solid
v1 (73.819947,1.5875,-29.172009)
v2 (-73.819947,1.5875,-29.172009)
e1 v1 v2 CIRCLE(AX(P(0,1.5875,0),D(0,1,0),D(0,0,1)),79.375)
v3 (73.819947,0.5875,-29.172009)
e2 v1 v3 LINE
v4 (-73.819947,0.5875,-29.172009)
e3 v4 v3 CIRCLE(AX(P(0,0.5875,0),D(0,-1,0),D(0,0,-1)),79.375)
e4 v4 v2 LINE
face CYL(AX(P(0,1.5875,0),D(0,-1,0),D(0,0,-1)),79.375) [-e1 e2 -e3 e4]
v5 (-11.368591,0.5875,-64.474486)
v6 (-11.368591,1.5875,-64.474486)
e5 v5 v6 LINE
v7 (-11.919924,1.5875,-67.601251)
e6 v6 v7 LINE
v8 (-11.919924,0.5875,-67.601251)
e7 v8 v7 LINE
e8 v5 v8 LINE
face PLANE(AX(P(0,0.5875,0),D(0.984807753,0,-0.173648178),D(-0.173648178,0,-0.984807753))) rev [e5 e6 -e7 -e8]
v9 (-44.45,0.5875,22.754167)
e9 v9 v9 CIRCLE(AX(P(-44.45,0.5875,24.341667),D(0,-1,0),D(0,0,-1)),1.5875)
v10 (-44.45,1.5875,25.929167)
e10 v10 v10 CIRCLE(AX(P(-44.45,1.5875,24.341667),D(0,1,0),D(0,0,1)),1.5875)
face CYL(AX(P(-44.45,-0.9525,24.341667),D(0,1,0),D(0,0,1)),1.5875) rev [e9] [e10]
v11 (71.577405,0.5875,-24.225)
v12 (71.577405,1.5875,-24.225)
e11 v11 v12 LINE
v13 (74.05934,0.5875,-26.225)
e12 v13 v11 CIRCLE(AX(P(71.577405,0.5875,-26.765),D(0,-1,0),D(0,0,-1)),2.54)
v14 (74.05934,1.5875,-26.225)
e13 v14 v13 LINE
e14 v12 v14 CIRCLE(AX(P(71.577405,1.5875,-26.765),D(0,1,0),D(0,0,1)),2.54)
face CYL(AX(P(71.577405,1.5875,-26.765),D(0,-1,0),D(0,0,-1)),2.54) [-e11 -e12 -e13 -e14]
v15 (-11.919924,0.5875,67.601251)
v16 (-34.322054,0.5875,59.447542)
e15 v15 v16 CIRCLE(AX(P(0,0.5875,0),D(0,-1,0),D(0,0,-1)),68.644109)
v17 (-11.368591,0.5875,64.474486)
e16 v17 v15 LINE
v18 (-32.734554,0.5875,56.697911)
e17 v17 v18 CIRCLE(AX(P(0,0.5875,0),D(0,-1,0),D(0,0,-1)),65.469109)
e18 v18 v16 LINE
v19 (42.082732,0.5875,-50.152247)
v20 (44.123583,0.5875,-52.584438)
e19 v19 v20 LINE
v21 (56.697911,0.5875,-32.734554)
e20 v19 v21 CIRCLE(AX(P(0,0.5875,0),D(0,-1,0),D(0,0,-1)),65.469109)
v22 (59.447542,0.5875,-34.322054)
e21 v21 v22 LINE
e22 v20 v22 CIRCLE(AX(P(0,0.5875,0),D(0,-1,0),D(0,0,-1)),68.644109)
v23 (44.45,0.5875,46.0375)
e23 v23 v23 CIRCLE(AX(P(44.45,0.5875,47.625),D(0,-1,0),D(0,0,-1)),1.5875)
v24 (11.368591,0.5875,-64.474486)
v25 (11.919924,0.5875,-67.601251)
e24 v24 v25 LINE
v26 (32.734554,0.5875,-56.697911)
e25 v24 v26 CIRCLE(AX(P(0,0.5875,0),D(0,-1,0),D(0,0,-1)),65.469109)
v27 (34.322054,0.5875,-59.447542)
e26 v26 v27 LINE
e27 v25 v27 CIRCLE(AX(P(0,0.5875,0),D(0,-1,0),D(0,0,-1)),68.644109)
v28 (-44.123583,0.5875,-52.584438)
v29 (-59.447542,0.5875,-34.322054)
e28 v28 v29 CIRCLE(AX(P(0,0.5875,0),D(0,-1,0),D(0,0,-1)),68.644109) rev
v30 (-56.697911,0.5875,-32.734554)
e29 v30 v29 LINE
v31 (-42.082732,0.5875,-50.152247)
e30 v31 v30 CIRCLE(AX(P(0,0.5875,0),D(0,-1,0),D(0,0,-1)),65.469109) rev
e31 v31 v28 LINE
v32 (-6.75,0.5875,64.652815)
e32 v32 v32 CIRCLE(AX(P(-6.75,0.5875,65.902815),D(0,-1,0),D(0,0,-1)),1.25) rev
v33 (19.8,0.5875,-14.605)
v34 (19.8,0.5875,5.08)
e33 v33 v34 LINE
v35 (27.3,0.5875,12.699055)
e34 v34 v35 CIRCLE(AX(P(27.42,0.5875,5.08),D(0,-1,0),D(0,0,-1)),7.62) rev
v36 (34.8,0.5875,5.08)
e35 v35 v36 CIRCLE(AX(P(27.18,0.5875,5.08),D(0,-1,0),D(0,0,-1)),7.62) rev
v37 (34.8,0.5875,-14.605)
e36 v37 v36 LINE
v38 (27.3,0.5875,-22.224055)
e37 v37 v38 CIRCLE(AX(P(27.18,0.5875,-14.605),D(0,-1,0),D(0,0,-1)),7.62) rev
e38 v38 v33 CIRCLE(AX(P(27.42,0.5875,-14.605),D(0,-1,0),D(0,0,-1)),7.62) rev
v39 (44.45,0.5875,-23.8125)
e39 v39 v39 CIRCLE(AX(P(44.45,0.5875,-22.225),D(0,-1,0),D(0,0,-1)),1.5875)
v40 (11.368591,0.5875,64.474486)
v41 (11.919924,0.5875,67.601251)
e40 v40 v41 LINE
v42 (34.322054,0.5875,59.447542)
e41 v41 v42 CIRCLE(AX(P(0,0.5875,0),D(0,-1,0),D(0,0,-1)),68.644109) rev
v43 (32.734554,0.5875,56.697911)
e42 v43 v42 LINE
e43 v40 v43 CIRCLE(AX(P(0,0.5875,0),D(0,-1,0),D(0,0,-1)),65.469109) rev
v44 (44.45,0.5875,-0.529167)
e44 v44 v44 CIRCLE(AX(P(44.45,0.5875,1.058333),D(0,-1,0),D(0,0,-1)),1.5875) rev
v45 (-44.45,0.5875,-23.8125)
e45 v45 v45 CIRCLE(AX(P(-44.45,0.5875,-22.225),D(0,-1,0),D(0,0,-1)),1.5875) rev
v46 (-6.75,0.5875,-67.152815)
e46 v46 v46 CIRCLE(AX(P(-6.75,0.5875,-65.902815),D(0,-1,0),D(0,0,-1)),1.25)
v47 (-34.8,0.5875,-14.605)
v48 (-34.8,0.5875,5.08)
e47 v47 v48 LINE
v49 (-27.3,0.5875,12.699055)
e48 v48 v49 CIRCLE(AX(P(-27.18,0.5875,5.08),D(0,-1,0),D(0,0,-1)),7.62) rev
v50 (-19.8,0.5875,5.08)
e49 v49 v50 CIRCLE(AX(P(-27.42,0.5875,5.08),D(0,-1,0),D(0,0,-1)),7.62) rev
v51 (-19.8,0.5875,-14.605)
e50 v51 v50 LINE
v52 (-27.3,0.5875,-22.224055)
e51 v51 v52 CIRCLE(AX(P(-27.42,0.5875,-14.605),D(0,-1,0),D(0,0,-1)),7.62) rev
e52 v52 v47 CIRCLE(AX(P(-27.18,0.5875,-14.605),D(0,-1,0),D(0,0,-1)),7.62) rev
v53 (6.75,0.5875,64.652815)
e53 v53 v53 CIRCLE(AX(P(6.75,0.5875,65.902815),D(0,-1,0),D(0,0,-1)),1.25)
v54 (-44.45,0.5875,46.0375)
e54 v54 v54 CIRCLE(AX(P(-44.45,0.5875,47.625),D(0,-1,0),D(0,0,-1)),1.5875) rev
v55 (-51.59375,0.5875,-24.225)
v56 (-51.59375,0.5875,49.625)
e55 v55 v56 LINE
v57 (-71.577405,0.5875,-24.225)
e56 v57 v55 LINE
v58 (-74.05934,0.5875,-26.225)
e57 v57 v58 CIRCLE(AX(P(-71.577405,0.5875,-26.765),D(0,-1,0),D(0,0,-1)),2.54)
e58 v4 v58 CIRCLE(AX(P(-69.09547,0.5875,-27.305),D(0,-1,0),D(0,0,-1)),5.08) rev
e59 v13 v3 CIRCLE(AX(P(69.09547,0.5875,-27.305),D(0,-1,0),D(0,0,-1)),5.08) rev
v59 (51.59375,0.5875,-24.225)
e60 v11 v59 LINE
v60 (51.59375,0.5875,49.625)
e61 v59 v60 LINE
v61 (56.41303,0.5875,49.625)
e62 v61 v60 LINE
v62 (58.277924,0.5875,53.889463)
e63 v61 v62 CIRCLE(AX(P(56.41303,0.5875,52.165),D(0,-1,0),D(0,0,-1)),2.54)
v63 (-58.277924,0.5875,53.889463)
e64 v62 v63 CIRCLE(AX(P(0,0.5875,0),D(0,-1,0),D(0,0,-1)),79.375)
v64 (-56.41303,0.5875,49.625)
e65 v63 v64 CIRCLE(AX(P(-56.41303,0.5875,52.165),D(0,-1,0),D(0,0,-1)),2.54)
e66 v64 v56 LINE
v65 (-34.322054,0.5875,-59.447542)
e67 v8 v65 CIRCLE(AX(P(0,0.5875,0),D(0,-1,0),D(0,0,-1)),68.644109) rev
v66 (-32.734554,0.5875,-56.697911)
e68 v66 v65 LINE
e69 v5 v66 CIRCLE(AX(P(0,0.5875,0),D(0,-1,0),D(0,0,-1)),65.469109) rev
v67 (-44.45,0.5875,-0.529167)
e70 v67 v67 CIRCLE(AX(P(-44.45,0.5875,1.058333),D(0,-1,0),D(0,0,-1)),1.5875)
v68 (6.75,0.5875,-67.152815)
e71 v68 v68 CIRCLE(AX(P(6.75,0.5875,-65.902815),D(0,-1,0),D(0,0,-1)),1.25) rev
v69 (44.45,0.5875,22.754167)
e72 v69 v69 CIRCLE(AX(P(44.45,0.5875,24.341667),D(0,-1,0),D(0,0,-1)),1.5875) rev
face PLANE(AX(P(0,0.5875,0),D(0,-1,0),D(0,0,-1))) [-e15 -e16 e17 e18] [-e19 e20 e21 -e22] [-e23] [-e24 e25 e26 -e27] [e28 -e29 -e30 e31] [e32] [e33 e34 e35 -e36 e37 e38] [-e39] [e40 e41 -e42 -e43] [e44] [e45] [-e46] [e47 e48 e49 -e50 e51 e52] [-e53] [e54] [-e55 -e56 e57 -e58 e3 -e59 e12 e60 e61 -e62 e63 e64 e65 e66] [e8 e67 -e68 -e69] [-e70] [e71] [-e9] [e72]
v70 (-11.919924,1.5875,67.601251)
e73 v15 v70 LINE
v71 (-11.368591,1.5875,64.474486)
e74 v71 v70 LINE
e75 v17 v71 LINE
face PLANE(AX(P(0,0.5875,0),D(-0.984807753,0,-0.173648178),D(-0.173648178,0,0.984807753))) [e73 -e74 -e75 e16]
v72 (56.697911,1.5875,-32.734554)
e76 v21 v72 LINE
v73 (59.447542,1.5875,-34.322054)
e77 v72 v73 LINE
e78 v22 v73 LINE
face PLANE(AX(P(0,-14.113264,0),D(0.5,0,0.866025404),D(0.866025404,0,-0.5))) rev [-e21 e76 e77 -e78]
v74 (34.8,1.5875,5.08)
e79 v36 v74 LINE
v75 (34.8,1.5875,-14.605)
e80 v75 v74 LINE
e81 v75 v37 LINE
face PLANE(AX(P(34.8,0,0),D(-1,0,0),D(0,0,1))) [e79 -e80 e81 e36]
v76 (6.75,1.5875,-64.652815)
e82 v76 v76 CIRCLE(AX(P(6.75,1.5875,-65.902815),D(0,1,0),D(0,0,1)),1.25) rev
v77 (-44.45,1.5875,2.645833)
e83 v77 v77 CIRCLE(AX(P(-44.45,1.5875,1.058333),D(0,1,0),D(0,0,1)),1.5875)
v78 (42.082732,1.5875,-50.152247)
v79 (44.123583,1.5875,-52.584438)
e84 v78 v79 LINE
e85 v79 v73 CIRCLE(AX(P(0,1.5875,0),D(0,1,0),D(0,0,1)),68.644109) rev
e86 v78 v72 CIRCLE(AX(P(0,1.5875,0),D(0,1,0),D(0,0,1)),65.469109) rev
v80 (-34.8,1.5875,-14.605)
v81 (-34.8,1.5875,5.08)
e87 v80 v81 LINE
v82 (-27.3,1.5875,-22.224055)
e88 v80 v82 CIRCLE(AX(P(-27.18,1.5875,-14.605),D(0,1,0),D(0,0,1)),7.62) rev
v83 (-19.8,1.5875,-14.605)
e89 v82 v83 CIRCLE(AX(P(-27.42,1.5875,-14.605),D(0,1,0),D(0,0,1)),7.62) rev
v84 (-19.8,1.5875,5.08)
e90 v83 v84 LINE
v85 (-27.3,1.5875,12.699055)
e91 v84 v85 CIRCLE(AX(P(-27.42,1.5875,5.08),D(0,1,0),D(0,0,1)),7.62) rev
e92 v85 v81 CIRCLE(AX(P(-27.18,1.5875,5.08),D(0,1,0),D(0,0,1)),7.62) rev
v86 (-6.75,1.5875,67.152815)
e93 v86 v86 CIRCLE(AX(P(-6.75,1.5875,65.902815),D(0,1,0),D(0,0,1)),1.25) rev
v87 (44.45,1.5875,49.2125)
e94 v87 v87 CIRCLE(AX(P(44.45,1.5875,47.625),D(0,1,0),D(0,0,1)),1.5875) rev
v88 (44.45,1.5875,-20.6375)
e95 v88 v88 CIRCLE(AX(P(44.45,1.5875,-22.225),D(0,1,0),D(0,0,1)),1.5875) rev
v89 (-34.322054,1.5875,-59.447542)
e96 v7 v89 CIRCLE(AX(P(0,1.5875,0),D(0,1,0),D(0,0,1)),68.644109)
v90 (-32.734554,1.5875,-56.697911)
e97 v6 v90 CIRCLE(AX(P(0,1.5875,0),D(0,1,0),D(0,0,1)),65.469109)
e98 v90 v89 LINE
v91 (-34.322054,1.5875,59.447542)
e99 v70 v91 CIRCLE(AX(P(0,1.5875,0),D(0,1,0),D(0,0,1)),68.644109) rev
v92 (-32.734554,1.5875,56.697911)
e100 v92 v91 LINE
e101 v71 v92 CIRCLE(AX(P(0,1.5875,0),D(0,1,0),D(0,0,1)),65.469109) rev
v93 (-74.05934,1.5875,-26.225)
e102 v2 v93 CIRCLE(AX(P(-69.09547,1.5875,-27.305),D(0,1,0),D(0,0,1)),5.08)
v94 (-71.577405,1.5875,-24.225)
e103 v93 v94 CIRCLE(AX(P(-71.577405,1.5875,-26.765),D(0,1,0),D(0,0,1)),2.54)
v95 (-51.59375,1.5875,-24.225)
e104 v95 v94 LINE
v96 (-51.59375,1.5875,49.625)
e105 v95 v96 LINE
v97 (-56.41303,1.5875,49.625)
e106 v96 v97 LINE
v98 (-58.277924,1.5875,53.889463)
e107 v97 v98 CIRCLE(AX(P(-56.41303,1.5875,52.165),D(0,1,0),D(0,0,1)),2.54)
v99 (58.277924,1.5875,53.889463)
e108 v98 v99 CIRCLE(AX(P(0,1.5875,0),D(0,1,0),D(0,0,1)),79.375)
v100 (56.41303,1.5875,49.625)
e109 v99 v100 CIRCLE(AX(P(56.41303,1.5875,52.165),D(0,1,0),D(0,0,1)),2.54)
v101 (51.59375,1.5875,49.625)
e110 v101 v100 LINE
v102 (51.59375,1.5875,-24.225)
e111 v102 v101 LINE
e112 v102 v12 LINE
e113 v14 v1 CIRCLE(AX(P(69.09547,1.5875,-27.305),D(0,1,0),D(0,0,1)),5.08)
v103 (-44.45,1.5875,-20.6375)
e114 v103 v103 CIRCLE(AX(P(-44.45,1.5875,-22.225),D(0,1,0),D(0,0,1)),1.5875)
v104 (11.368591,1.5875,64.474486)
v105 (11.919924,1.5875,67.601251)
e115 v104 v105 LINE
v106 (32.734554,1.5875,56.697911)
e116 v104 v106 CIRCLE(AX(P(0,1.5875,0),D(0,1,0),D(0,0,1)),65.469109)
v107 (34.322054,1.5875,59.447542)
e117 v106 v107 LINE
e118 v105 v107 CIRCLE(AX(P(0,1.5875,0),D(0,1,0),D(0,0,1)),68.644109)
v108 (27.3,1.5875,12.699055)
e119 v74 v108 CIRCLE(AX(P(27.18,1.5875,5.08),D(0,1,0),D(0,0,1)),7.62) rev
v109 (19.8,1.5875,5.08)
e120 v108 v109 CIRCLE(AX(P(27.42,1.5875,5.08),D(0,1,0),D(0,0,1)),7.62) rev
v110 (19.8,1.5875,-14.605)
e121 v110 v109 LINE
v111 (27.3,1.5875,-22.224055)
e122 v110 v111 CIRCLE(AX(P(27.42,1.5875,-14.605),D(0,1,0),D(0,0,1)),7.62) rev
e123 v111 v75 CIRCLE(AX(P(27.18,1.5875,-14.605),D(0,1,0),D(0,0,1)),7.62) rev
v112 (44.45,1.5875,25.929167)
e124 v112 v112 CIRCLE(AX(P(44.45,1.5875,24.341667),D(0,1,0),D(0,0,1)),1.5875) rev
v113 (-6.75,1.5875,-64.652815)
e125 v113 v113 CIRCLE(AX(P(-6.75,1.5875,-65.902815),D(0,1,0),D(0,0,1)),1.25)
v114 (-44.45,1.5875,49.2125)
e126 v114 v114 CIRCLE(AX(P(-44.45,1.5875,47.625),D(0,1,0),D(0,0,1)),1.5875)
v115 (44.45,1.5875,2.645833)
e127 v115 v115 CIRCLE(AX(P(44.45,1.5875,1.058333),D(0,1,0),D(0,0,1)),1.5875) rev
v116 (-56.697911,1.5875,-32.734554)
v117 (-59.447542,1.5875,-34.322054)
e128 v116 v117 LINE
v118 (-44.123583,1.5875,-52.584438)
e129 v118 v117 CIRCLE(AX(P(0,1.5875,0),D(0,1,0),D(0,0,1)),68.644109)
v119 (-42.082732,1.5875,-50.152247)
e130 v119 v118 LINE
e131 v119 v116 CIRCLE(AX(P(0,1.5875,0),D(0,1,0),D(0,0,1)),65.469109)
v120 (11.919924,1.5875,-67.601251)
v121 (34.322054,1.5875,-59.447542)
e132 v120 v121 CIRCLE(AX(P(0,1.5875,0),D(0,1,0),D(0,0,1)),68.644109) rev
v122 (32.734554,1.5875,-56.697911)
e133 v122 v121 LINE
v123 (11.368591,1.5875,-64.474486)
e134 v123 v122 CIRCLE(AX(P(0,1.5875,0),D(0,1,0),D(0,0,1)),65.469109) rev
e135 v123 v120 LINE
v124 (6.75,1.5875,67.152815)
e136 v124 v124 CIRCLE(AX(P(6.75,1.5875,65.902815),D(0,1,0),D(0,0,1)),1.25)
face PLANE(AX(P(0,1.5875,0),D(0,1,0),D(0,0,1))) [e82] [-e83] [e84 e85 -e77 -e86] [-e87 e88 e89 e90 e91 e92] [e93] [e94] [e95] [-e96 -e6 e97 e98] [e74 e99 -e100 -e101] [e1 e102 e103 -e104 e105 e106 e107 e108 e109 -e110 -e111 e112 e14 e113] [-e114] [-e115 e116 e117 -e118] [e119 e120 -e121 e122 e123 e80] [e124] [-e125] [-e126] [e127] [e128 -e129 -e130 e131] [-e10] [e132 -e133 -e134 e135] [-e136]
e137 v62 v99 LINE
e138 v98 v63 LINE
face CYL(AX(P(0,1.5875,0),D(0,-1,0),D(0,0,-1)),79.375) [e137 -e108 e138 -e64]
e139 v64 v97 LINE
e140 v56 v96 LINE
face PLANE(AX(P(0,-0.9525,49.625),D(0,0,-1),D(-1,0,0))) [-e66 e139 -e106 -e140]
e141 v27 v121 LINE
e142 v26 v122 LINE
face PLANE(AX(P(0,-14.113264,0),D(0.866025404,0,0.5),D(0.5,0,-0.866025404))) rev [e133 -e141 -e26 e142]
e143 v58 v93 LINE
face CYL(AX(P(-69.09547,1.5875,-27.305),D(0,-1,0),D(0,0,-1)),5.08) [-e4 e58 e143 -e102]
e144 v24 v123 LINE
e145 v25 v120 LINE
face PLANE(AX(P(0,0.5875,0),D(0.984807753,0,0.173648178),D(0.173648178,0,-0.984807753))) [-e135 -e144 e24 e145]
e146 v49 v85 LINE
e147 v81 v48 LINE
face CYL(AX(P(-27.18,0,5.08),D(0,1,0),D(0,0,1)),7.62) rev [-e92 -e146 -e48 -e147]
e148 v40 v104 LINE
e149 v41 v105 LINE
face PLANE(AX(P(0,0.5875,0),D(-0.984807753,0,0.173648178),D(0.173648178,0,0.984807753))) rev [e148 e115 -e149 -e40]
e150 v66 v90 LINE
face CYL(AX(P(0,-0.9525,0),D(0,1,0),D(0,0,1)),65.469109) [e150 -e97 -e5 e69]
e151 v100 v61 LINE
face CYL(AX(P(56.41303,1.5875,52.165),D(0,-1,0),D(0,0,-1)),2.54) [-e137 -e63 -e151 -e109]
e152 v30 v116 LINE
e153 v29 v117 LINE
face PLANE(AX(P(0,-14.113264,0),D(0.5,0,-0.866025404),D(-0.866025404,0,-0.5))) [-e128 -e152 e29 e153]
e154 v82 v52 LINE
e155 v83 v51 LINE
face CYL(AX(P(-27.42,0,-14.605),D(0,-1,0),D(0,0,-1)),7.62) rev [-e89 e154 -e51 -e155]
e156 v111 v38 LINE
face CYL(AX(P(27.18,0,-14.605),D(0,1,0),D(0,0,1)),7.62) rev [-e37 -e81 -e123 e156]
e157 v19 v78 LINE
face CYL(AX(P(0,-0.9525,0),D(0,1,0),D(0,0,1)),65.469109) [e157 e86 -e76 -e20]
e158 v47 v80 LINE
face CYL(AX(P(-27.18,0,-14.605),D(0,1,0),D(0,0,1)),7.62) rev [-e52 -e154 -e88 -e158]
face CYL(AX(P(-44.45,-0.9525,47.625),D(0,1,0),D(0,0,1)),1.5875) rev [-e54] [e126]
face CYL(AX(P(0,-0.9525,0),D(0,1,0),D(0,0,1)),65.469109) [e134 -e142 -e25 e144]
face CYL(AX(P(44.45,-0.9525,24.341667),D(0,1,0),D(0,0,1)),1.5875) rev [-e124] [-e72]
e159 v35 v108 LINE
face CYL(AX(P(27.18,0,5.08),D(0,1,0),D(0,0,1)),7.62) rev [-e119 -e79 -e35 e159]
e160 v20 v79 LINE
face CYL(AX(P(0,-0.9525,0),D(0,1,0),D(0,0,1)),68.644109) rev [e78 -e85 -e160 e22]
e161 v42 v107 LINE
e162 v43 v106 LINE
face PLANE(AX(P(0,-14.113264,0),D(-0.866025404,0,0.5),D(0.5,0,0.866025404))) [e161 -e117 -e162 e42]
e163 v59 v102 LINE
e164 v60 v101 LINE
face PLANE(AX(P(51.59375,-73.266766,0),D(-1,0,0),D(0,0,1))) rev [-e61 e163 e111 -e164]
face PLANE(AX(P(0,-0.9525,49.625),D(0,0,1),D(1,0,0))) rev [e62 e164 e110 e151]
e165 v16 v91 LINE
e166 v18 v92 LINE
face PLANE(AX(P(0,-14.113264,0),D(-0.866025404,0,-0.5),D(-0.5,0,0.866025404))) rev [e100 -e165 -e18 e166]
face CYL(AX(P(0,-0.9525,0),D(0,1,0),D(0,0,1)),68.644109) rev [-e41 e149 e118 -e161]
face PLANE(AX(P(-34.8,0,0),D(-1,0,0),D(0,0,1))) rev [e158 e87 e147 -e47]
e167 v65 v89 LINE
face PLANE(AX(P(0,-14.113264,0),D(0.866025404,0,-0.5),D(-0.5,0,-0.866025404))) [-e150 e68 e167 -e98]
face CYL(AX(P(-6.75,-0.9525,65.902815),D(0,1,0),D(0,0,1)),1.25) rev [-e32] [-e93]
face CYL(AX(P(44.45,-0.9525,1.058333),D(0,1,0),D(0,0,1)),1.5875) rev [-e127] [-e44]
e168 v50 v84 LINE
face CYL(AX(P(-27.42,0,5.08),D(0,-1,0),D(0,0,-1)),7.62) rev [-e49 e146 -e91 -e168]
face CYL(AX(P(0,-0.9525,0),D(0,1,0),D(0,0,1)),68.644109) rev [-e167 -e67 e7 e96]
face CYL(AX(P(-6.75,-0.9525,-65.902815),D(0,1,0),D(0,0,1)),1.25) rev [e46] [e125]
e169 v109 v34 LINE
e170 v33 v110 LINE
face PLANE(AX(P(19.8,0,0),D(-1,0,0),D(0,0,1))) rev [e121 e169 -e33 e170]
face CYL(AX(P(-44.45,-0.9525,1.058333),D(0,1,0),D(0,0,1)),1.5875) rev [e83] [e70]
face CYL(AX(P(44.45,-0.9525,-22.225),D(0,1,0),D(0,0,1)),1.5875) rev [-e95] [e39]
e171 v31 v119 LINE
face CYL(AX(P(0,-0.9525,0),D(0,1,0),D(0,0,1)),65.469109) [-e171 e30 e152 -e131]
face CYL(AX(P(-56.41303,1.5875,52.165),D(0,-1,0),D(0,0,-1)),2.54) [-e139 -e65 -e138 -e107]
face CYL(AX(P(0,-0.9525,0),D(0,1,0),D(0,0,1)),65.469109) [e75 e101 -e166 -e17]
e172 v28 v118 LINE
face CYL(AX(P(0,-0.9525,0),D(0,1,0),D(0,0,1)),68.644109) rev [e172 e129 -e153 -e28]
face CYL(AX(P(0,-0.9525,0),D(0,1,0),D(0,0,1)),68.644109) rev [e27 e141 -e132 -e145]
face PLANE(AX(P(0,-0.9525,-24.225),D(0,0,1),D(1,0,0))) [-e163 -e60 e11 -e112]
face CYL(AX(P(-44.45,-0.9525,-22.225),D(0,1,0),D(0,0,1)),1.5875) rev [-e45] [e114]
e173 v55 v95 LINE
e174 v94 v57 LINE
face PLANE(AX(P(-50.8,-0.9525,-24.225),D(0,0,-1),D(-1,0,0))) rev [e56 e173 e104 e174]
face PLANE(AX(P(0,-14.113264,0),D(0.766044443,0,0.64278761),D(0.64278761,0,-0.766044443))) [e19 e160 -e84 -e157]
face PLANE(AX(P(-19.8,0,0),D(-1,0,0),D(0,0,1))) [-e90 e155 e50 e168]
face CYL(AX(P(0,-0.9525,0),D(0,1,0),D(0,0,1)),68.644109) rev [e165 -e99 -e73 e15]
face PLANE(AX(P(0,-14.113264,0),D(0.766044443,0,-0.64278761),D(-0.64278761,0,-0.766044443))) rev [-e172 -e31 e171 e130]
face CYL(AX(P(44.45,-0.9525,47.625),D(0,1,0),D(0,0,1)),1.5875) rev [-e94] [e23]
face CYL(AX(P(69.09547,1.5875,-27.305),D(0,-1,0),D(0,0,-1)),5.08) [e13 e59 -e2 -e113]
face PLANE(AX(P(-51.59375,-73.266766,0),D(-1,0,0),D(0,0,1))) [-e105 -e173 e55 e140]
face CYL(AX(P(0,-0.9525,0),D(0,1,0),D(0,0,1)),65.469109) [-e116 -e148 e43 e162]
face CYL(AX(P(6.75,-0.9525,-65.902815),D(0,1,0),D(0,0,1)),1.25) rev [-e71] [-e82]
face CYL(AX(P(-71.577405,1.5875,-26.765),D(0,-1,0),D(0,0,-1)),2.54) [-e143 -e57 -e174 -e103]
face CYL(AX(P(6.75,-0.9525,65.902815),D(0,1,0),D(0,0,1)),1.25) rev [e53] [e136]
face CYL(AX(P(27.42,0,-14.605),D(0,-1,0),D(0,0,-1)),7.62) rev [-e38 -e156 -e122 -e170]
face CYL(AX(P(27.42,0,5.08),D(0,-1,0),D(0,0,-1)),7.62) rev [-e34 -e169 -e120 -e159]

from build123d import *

# Parameters (mm, degrees)
SKETCH1_R            = 1.5875
BOSS_EXTRUDE5_DEPTH  = 1.5875
FILLET2_R            = 2.54
FILLET3_R            = 2.54
FILLET4_R            = 5.08
CUT_EXTRUDE1_START   = -2.54
SKETCH2_R            = 2.38125
SKETCH2_R_2          = 1.5875
CUT_EXTRUDE1_DEPTH   = 2.54
SKETCH3_R            = 1.5875
CUT_EXTRUDE2_DEPTH   = 2.54
CUT_EXTRUDE3_DEPTH   = 2.54
SKETCH5_W            = 15
SKETCH5_H            = 34.925
CUT_EXTRUDE4_DEPTH   = 109.650407999
FILLET5_R            = 7.62
FILLET6_R            = 7.62
SKETCH6_R            = 79.375
CUT_EXTRUDE5_DEPTH   = 0.5875
SKETCH8_W            = 24.650607139
SKETCH8_H            = 2
SKETCH8_W_2          = 29.436542116
CUT_EXTRUDE6_DEPTH   = 2.54
FILLET7_R            = 2.54
SKETCH11_W           = 22.261978792
SKETCH11_H           = 11.326269911
SKETCH11_H_2         = 10.545147849
BOSS_EXTRUDE7_DEPTH  = 1
SKETCH12_R           = 1.25
CUT_EXTRUDE7_DEPTH   = 2.54
SKETCH14_R           = 1.5875
BOSS_EXTRUDE8_DEPTH  = 1
SKETCH15_R           = 1.5875
CUT_EXTRUDE8_DEPTH   = 2.54
SKETCH16_W           = 0.79375
SKETCH16_H           = 25.283333333
SKETCH16_H_2         = 48.566666667
SKETCH16_H_3         = 73.85
BOSS_EXTRUDE13_DEPTH = 1
CUT_EXTRUDE10_DEPTH  = 109.643412285
BOSS_EXTRUDE16_START = -1
BOSS_EXTRUDE16_DEPTH = 1


with BuildPart() as part:
    # Sketch1 → Boss-Extrude5 (new body)
    with BuildSketch(Plane(origin=(0, 0, 0), x_dir=(1, 0, 0), z_dir=(0, 1, 0))):
        with BuildLine():
            ThreePointArc((-63.5, -47.625), (-35.497579143, -70.995158286), (0, -79.375))
            ThreePointArc((0, -79.375), (35.497579143, -70.995158286), (63.5, -47.625))
            Line((63.5, -47.625), (50.8, -47.625))
            Line((50.8, -47.625), (50.8, 22.225))
            Line((50.8, 22.225), (76.2, 22.225))
            ThreePointArc((76.2, 22.225), (0, 79.375), (-76.2, 22.225))
            Line((-76.2, 22.225), (-50.8, 22.225))
            Line((-50.8, 22.225), (-50.8, -47.625))
            Line((-50.8, -47.625), (-63.5, -47.625))
        make_face()
        with Locations(Location((-7.14375, -66.675, 0), (0, 0, 270))):
            Circle(SKETCH1_R, mode=Mode.SUBTRACT)
        with BuildLine():
            ThreePointArc((8.73125, -66.675), (7.14375, -68.2625), (5.55625, -66.675))
            ThreePointArc((5.55625, -66.675), (7.14375, -65.0875), (8.73125, -66.675))
        make_face(mode=Mode.SUBTRACT)
        with Locations(Location((-7.14375, 66.675, 0), (0, 0, 270))):
            Circle(SKETCH1_R, mode=Mode.SUBTRACT)
        with Locations(Location((7.14375, 66.675, 0), (0, 0, 270))):
            Circle(SKETCH1_R, mode=Mode.SUBTRACT)
    extrude(amount=BOSS_EXTRUDE5_DEPTH)

    # Fillet2
    fillet2_edges = [part.edges().sort_by_distance(p)[0] for p in [
        (-63.5, 0.79375, 47.625),
    ]]
    fillet(fillet2_edges, radius=FILLET2_R)

    # Fillet3
    fillet3_edges = [part.edges().sort_by_distance(p)[0] for p in [
        (63.5, 0.79375, 47.625),
    ]]
    fillet(fillet3_edges, radius=FILLET3_R)

    # Fillet4
    fillet4_edges = [part.edges().sort_by_distance(p)[0] for p in [
        (-76.2, 0.79375, -22.225),
        (76.2, 0.79375, -22.225),
    ]]
    fillet(fillet4_edges, radius=FILLET4_R)

    # Sketch2 → Cut-Extrude1 (cut)
    # profile 1 of 10: a face of its own
    with BuildSketch(Plane(origin=(0, 1.5875, 0), x_dir=(1, 0, 0), z_dir=(0, 1, 0)).offset(CUT_EXTRUDE1_START)):
        with BuildLine():
            Line((-61.088622125, 27.654457796), (-59.642408406, 26.999765402))
            ThreePointArc((-59.642408406, 26.999765402), (-52.384826382, 39.268743005), (-42.643785254, 49.676068599))
            Line((-42.643785254, 49.676068599), (-43.677815048, 50.880617741))
            Line((-43.677815048, 50.880617741), (-44.711844841, 52.085166883))
            ThreePointArc((-44.711844841, 52.085166883), (-54.925289002, 41.173126022), (-62.534835843, 28.309150189))
            Line((-62.534835843, 28.309150189), (-61.088622125, 27.654457796))
        make_face()
    # profile 2 of 10: a face of its own
    with BuildSketch(Plane(origin=(0, 1.5875, 0), x_dir=(1, 0, 0), z_dir=(0, 1, 0)).offset(CUT_EXTRUDE1_START)):
        with BuildLine():
            Line((-39.077069744, 54.493774041), (-38.151958122, 53.203686937))
            ThreePointArc((-38.151958122, 53.203686937), (-25.732218917, 60.200142208), (-12.092567045, 64.342629994))
            Line((-12.092567045, 64.342629994), (-12.385788543, 65.902815048))
            Line((-12.385788543, 65.902815048), (-12.679010041, 67.463000102))
            ThreePointArc((-12.679010041, 67.463000102), (-26.980132574, 63.119617589), (-40.002181367, 55.783861145))
            Line((-40.002181367, 55.783861145), (-39.077069744, 54.493774041))
        make_face()
    # profile 3 of 10: a face of its own
    with BuildSketch(Plane(origin=(0, 1.5875, 0), x_dir=(1, 0, 0), z_dir=(0, 1, 0)).offset(CUT_EXTRUDE1_START)):
        with Locations(Location((-7.14375, 66.675, 0), (0, 0, 270))):
            Circle(SKETCH2_R)
        with Locations((-7.14375, 66.675)):
            Circle(SKETCH2_R_2, mode=Mode.SUBTRACT)
    # profile 4 of 10: a face of its own
    with BuildSketch(Plane(origin=(0, 1.5875, 0), x_dir=(1, 0, 0), z_dir=(0, 1, 0)).offset(CUT_EXTRUDE1_START)):
        with Locations(Location((7.14375, 66.675, 0), (0, 0, 270))):
            Circle(SKETCH2_R)
        with Locations((7.14375, 66.675)):
            Circle(SKETCH2_R_2, mode=Mode.SUBTRACT)
    # profile 5 of 10: a face of its own
    with BuildSketch(Plane(origin=(0, 1.5875, 0), x_dir=(1, 0, 0), z_dir=(0, 1, 0)).offset(CUT_EXTRUDE1_START)):
        with BuildLine():
            ThreePointArc((12.679010041, 67.463000102), (26.980132574, 63.119617589), (40.002181367, 55.783861145))
            Line((40.002181367, 55.783861145), (39.077069744, 54.493774041))
            Line((39.077069744, 54.493774041), (38.151958122, 53.203686937))
            ThreePointArc((38.151958122, 53.203686937), (25.732218917, 60.200142208), (12.092567045, 64.342629994))
            Line((12.092567045, 64.342629994), (12.385788543, 65.902815048))
            Line((12.385788543, 65.902815048), (12.679010041, 67.463000102))
        make_face()
    # profile 6 of 10: a face of its own
    with BuildSketch(Plane(origin=(0, 1.5875, 0), x_dir=(1, 0, 0), z_dir=(0, 1, 0)).offset(CUT_EXTRUDE1_START)):
        with BuildLine():
            ThreePointArc((44.711844841, 52.085166883), (54.925289002, 41.173126022), (62.534835843, 28.309150189))
            Line((62.534835843, 28.309150189), (59.642408406, 26.999765402))
            ThreePointArc((59.642408406, 26.999765402), (52.384826382, 39.268743005), (42.643785254, 49.676068599))
            Line((42.643785254, 49.676068599), (43.677815048, 50.880617741))
            Line((43.677815048, 50.880617741), (44.711844841, 52.085166883))
        make_face()
    # profile 7 of 10: a face of its own
    with BuildSketch(Plane(origin=(0, 1.5875, 0), x_dir=(1, 0, 0), z_dir=(0, 1, 0)).offset(CUT_EXTRUDE1_START)):
        with BuildLine():
            ThreePointArc((-12.679010041, -67.463000102), (-26.980132574, -63.119617589), (-40.002181367, -55.783861145))
            Line((-40.002181367, -55.783861145), (-39.077069744, -54.493774041))
            Line((-39.077069744, -54.493774041), (-38.151958122, -53.203686937))
            ThreePointArc((-38.151958122, -53.203686937), (-25.732218917, -60.200142208), (-12.092567045, -64.342629994))
            Line((-12.092567045, -64.342629994), (-12.385788543, -65.902815048))
            Line((-12.385788543, -65.902815048), (-12.679010041, -67.463000102))
        make_face()
    # profile 8 of 10: a face of its own
    with BuildSketch(Plane(origin=(0, 1.5875, 0), x_dir=(1, 0, 0), z_dir=(0, 1, 0)).offset(CUT_EXTRUDE1_START)):
        with Locations(Location((-7.14375, -66.675, 0), (0, 0, 270))):
            Circle(SKETCH2_R)
        with Locations((-7.14375, -66.675)):
            Circle(SKETCH2_R_2, mode=Mode.SUBTRACT)
    # profile 9 of 10: a face of its own
    with BuildSketch(Plane(origin=(0, 1.5875, 0), x_dir=(1, 0, 0), z_dir=(0, 1, 0)).offset(CUT_EXTRUDE1_START)):
        with Locations(Location((7.14375, -66.675, 0), (0, 0, 270))):
            Circle(SKETCH2_R)
        with Locations((7.14375, -66.675)):
            Circle(SKETCH2_R_2, mode=Mode.SUBTRACT)
    # profile 10 of 10: a face of its own
    with BuildSketch(Plane(origin=(0, 1.5875, 0), x_dir=(1, 0, 0), z_dir=(0, 1, 0)).offset(CUT_EXTRUDE1_START)):
        with BuildLine():
            ThreePointArc((12.092567045, -64.342629994), (25.732218917, -60.200142208), (38.151958122, -53.203686937))
            Line((38.151958122, -53.203686937), (39.077069744, -54.493774041))
            Line((39.077069744, -54.493774041), (40.002181367, -55.783861145))
            ThreePointArc((40.002181367, -55.783861145), (26.980132574, -63.119617589), (12.679010041, -67.463000102))
            Line((12.679010041, -67.463000102), (12.385788543, -65.902815048))
            Line((12.385788543, -65.902815048), (12.092567045, -64.342629994))
        make_face()
    extrude(amount=CUT_EXTRUDE1_DEPTH, mode=Mode.SUBTRACT)

    # Sketch3 → Cut-Extrude2 (cut)
    with BuildSketch(Plane(origin=(0, 1.5875, 0), x_dir=(1, 0, 0), z_dir=(0, 1, 0))):
        with Locations(Location((-44.45, -47.625, 0), (0, 0, 270))):
            Circle(SKETCH3_R)
        with Locations(Location((-44.45, 22.225, 0), (0, 0, 270))):
            Circle(SKETCH3_R)
        with Locations(Location((44.45, 22.225, 0), (0, 0, 270))):
            Circle(SKETCH3_R)
        with Locations(Location((44.45, -47.625, 0), (0, 0, 270))):
            Circle(SKETCH3_R)
    extrude(amount=-CUT_EXTRUDE2_DEPTH, mode=Mode.SUBTRACT)

    # Sketch4 → Cut-Extrude3 (cut)
    with BuildSketch(Plane(origin=(0, 1.5875, 0), x_dir=(1, 0, 0), z_dir=(0, 1, 0))):
        with BuildLine():
            ThreePointArc((-44.45, -11.1125), (-46.0375, -12.7), (-44.45, -14.2875))
            Line((-44.45, -14.2875), (-44.45, -11.1125))
        make_face()
        with BuildLine():
            Line((-44.45, -11.1125), (-44.45, -14.2875))
            ThreePointArc((-44.45, -14.2875), (-43.327467985, -13.822532015), (-42.8625, -12.7))
            ThreePointArc((-42.8625, -12.7), (-43.327467985, -11.577467985), (-44.45, -11.1125))
        make_face()
        with BuildLine():
            ThreePointArc((44.45, -11.1125), (42.8625, -12.7), (44.45, -14.2875))
            Line((44.45, -14.2875), (44.45, -11.1125))
        make_face()
        with BuildLine():
            Line((44.45, -11.1125), (44.45, -14.2875))
            ThreePointArc((44.45, -14.2875), (45.572532015, -13.822532015), (46.0375, -12.7))
            ThreePointArc((46.0375, -12.7), (45.572532015, -11.577467985), (44.45, -11.1125))
        make_face()
    extrude(amount=-CUT_EXTRUDE3_DEPTH, mode=Mode.SUBTRACT)

    # Sketch5 → Cut-Extrude4 (cut, through all)
    with BuildSketch(Plane(origin=(0, 1.5875, 0), x_dir=(1, 0, 0), z_dir=(0, 1, 0))):
        with Locations((-27.3, 4.7625)):
            Rectangle(SKETCH5_W, SKETCH5_H)
        with Locations((27.3, 4.7625)):
            Rectangle(SKETCH5_W, SKETCH5_H)
    extrude(amount=-CUT_EXTRUDE4_DEPTH, mode=Mode.SUBTRACT)

    # Fillet5
    # the kernel refuses this fillet: 7.62 mm, written as the material it adds along each edge
    with BuildSketch(Plane(origin=(-19.8, 1.5875, 12.7), x_dir=(0, 0, -1), z_dir=(0, -1, 0))) as fillet5_piece_1:
        with BuildLine():
            CenterArc((FILLET5_R, -FILLET5_R), FILLET5_R, 90, 90)
            Line((0, -FILLET5_R), (0, 0))
            Line((0, 0), (FILLET5_R, 0))
        make_face()
    extrude(amount=1.5875)
    with BuildSketch(Plane(origin=(-34.8, 1.5875, 12.7), x_dir=(0, 0, -1), z_dir=(0, -1, 0)), Plane(origin=(-19.8, 1.5875, -22.225), x_dir=(0, 0, 1), z_dir=(0, -1, 0)), Plane(origin=(-34.8, 1.5875, -22.225), x_dir=(1, 0, 0), z_dir=(0, -1, 0))) as fillet5_piece_2:
        with BuildLine():
            CenterArc((FILLET5_R, FILLET5_R), FILLET5_R, 180, 90)
            Line((0, FILLET5_R), (0, 0))
            Line((0, 0), (FILLET5_R, 0))
        make_face()
    extrude(amount=1.5875)

    # Fillet6
    # the kernel refuses this fillet: 7.62 mm, written as the material it adds along each edge
    with BuildSketch(Plane(origin=(34.8, 1.5875, 12.7), x_dir=(0, 0, -1), z_dir=(0, -1, 0)), Plane(origin=(34.8, 1.5875, -22.225), x_dir=(-1, 0, 0), z_dir=(0, -1, 0))) as fillet6_piece_1:
        with BuildLine():
            CenterArc((FILLET6_R, -FILLET6_R), FILLET6_R, 90, 90)
            Line((0, -FILLET6_R), (0, 0))
            Line((0, 0), (FILLET6_R, 0))
        make_face()
    extrude(amount=1.5875)
    with BuildSketch(Plane(origin=(19.8, 1.5875, -22.225), x_dir=(1, 0, 0), z_dir=(0, -1, 0)), Plane(origin=(19.8, 1.5875, 12.7), x_dir=(0, 0, -1), z_dir=(0, -1, 0))) as fillet6_piece_2:
        with BuildLine():
            CenterArc((FILLET6_R, FILLET6_R), FILLET6_R, 180, 90)
            Line((0, FILLET6_R), (0, 0))
            Line((0, 0), (FILLET6_R, 0))
        make_face()
    extrude(amount=1.5875)

    # Sketch6 → Cut-Extrude5 (cut)
    with BuildSketch(Plane(origin=(0, 0, 0), x_dir=(-1, 0, 0), z_dir=(0, -1, 0))):
        Circle(SKETCH6_R)
    extrude(amount=-CUT_EXTRUDE5_DEPTH, mode=Mode.SUBTRACT)

    # Sketch8 → Cut-Extrude6 (cut)
    with BuildSketch(Plane(origin=(0, 1.5875, 0), x_dir=(1, 0, 0), z_dir=(0, 1, 0))):
        with Locations((-63.12530357, -48.625)):
            Rectangle(SKETCH8_W, SKETCH8_H)
        with Locations((63.12530357, -48.625)):
            Rectangle(SKETCH8_W, SKETCH8_H)
        with Locations((65.518271058, 23.225)):
            Rectangle(SKETCH8_W_2, SKETCH8_H)
        with Locations((-65.518271058, 23.225)):
            Rectangle(SKETCH8_W_2, SKETCH8_H)
    extrude(amount=-CUT_EXTRUDE6_DEPTH, mode=Mode.SUBTRACT)

    # Fillet7
    fillet7_edges = [part.edges().sort_by_distance(p)[0] for p in [
        (-73.13527216, 1.0875, -24.225),
    ]]
    fillet(fillet7_edges, radius=FILLET7_R)
    fillet7_2_edges = [part.edges().sort_by_distance(p)[0] for p in [
        (-60.680646055, 1.0875, 49.625),
    ]]
    fillet(fillet7_2_edges, radius=FILLET7_R)
    fillet7_3_edges = [part.edges().sort_by_distance(p)[0] for p in [
        (73.13527216, 1.0875, -24.225),
    ]]
    fillet(fillet7_3_edges, radius=FILLET7_R)
    fillet7_4_edges = [part.edges().sort_by_distance(p)[0] for p in [
        (60.680646055, 1.0875, 49.625),
    ]]
    fillet(fillet7_4_edges, radius=FILLET7_R)

    # Sketch11 → Boss-Extrude7 (add)
    with BuildSketch(Plane(origin=(0, 1.5875, 0), x_dir=(1, 0, 0), z_dir=(0, 1, 0))):
        with Locations((0.072710042, 66.44599468)):
            Rectangle(SKETCH11_W, SKETCH11_H)
        with Locations((0.072710042, -66.930597559)):
            Rectangle(SKETCH11_W, SKETCH11_H_2)
    extrude(amount=-BOSS_EXTRUDE7_DEPTH)

    # Sketch12 → Cut-Extrude7 (cut)
    with BuildSketch(Plane(origin=(0, 1.5875, 0), x_dir=(1, 0, 0), z_dir=(0, 1, 0))):
        with Locations(Location((-6.75, 65.902815048, 0), (0, 0, 270))):
            Circle(SKETCH12_R)
        with Locations(Location((6.75, 65.902815048, 0), (0, 0, 270))):
            Circle(SKETCH12_R)
        with Locations(Location((6.75, -65.902815048, 0), (0, 0, 270))):
            Circle(SKETCH12_R)
        with Locations(Location((-6.75, -65.902815048, 0), (0, 0, 270))):
            Circle(SKETCH12_R)
    extrude(amount=-CUT_EXTRUDE7_DEPTH, mode=Mode.SUBTRACT)

    # Sketch14 → Boss-Extrude8 (add)
    with BuildSketch(Plane(origin=(0, 1.5875, 0), x_dir=(1, 0, 0), z_dir=(0, 1, 0))):
        with Locations((-44.45, -12.7)):
            Circle(SKETCH14_R)
        with Locations((44.45, -12.7)):
            Circle(SKETCH14_R)
    extrude(amount=-BOSS_EXTRUDE8_DEPTH)

    # Sketch15 → Cut-Extrude8 (cut)
    with BuildSketch(Plane(origin=(0, 1.5875, 0), x_dir=(1, 0, 0), z_dir=(0, 1, 0))):
        with Locations(Location((-44.45, -1.058333333, 0), (0, 0, 270))):
            Circle(SKETCH15_R)
        with Locations(Location((-44.45, -24.341666667, 0), (0, 0, 270))):
            Circle(SKETCH15_R)
        with Locations(Location((44.45, -24.341666667, 0), (0, 0, 270))):
            Circle(SKETCH15_R)
        with Locations(Location((44.45, -1.058333333, 0), (0, 0, 270))):
            Circle(SKETCH15_R)
    extrude(amount=-CUT_EXTRUDE8_DEPTH, mode=Mode.SUBTRACT)

    # Sketch16 → Boss-Extrude13 (add)
    with BuildSketch(Plane(origin=(0, 1.5875, 0), x_dir=(1, 0, 0), z_dir=(0, 1, 0))):
        with Locations((-51.196875, 11.583333334)):
            Rectangle(SKETCH16_W, SKETCH16_H)
        with Locations((-51.196875, -25.341666667)):
            Rectangle(SKETCH16_W, SKETCH16_H_2)
        with Locations((51.196875, -12.7)):
            Rectangle(SKETCH16_W, SKETCH16_H_3)
    extrude(amount=-BOSS_EXTRUDE13_DEPTH)

    # Sketch17 → Cut-Extrude10 (cut, through all)
    with BuildSketch(Plane(origin=(0, 1.5875, 0), x_dir=(1, 0, 0), z_dir=(0, 1, 0))):
        with BuildLine():
            ThreePointArc((-59.642408406, 26.999765402), (-40.146347222, 51.715326712), (-11.368591443, 64.474485968))
            Line((-11.368591443, 64.474485968), (-11.919924408, 67.601250584))
            ThreePointArc((-11.919924408, 67.601250584), (-42.093290669, 54.223321173), (-62.534835843, 28.309150189))
            Line((-62.534835843, 28.309150189), (-59.642408406, 26.999765402))
        make_face()
        with BuildLine():
            Line((11.919924408, 67.601250584), (11.368591443, 64.474485968))
            ThreePointArc((11.368591443, 64.474485968), (40.146347222, 51.715326712), (59.642408406, 26.999765402))
            Line((59.642408406, 26.999765402), (62.534835843, 28.309150189))
            ThreePointArc((62.534835843, 28.309150189), (42.093290669, 54.223321173), (11.919924408, 67.601250584))
        make_face()
        with BuildLine():
            ThreePointArc((38.151958122, -53.203686937), (25.393482136, -60.343808939), (11.368591443, -64.474485968))
            Line((11.368591443, -64.474485968), (11.919924408, -67.601250584))
            ThreePointArc((11.919924408, -67.601250584), (26.624968362, -63.270251604), (40.002181367, -55.783861145))
            Line((40.002181367, -55.783861145), (38.151958122, -53.203686937))
        make_face()
        with BuildLine():
            ThreePointArc((-11.368591443, -64.474485968), (-25.393482136, -60.343808939), (-38.151958122, -53.203686937))
            Line((-38.151958122, -53.203686937), (-40.002181367, -55.783861145))
            ThreePointArc((-40.002181367, -55.783861145), (-26.624968362, -63.270251604), (-11.919924408, -67.601250584))
            Line((-11.919924408, -67.601250584), (-11.368591443, -64.474485968))
        make_face()
    extrude(amount=-CUT_EXTRUDE10_DEPTH, mode=Mode.SUBTRACT)

    # Sketch18 → Boss-Extrude16 (add)
    with BuildSketch(Plane(origin=(0, 1.5875, 0), x_dir=(1, 0, 0), z_dir=(0, 1, 0)).offset(BOSS_EXTRUDE16_START)):
        with BuildLine():
            Line((-34.32205442, -59.447542075), (-32.73455442, -56.697911418))
            ThreePointArc((-32.73455442, -56.697911418), (-35.486290539, -55.017518992), (-38.151958122, -53.203686937))
            Line((-38.151958122, -53.203686937), (-40.002181367, -55.783861145))
            ThreePointArc((-40.002181367, -55.783861145), (-37.207239159, -57.685657078), (-34.32205442, -59.447542075))
        make_face()
        with BuildLine():
            ThreePointArc((38.151958122, -53.203686937), (35.486290539, -55.017518992), (32.73455442, -56.697911418))
            Line((32.73455442, -56.697911418), (34.32205442, -59.447542075))
            ThreePointArc((34.32205442, -59.447542075), (37.207239159, -57.685657078), (40.002181367, -55.783861145))
            Line((40.002181367, -55.783861145), (38.151958122, -53.203686937))
        make_face()
        with BuildLine():
            Line((59.447542075, 34.32205442), (56.697911418, 32.73455442))
            ThreePointArc((56.697911418, 32.73455442), (58.240788589, 29.90342383), (59.642408406, 26.999765402))
            Line((59.642408406, 26.999765402), (62.534835843, 28.309150189))
            ThreePointArc((62.534835843, 28.309150189), (61.065242855, 31.353624885), (59.447542075, 34.32205442))
        make_face()
        with BuildLine():
            Line((34.32205442, 59.447542075), (32.73455442, 56.697911418))
            ThreePointArc((32.73455442, 56.697911418), (37.551538139, 53.629154344), (42.082731979, 50.152247023))
            Line((42.082731979, 50.152247023), (44.12358264, 52.584438129))
            ThreePointArc((44.12358264, 52.584438129), (39.372643325, 56.229962084), (34.32205442, 59.447542075))
        make_face()
        with BuildLine():
            ThreePointArc((-42.082731979, 50.152247023), (-37.551538139, 53.629154344), (-32.73455442, 56.697911418))
            Line((-32.73455442, 56.697911418), (-34.32205442, 59.447542075))
            ThreePointArc((-34.32205442, 59.447542075), (-39.372643325, 56.229962084), (-44.12358264, 52.584438129))
            Line((-44.12358264, 52.584438129), (-42.082731979, 50.152247023))
        make_face()
        with BuildLine():
            ThreePointArc((-59.642408406, 26.999765402), (-58.240788589, 29.90342383), (-56.697911418, 32.73455442))
            Line((-56.697911418, 32.73455442), (-59.447542075, 34.32205442))
            ThreePointArc((-59.447542075, 34.32205442), (-61.065242855, 31.353624885), (-62.534835843, 28.309150189))
            Line((-62.534835843, 28.309150189), (-59.642408406, 26.999765402))
        make_face()
    extrude(amount=BOSS_EXTRUDE16_DEPTH)


solid = part.part
